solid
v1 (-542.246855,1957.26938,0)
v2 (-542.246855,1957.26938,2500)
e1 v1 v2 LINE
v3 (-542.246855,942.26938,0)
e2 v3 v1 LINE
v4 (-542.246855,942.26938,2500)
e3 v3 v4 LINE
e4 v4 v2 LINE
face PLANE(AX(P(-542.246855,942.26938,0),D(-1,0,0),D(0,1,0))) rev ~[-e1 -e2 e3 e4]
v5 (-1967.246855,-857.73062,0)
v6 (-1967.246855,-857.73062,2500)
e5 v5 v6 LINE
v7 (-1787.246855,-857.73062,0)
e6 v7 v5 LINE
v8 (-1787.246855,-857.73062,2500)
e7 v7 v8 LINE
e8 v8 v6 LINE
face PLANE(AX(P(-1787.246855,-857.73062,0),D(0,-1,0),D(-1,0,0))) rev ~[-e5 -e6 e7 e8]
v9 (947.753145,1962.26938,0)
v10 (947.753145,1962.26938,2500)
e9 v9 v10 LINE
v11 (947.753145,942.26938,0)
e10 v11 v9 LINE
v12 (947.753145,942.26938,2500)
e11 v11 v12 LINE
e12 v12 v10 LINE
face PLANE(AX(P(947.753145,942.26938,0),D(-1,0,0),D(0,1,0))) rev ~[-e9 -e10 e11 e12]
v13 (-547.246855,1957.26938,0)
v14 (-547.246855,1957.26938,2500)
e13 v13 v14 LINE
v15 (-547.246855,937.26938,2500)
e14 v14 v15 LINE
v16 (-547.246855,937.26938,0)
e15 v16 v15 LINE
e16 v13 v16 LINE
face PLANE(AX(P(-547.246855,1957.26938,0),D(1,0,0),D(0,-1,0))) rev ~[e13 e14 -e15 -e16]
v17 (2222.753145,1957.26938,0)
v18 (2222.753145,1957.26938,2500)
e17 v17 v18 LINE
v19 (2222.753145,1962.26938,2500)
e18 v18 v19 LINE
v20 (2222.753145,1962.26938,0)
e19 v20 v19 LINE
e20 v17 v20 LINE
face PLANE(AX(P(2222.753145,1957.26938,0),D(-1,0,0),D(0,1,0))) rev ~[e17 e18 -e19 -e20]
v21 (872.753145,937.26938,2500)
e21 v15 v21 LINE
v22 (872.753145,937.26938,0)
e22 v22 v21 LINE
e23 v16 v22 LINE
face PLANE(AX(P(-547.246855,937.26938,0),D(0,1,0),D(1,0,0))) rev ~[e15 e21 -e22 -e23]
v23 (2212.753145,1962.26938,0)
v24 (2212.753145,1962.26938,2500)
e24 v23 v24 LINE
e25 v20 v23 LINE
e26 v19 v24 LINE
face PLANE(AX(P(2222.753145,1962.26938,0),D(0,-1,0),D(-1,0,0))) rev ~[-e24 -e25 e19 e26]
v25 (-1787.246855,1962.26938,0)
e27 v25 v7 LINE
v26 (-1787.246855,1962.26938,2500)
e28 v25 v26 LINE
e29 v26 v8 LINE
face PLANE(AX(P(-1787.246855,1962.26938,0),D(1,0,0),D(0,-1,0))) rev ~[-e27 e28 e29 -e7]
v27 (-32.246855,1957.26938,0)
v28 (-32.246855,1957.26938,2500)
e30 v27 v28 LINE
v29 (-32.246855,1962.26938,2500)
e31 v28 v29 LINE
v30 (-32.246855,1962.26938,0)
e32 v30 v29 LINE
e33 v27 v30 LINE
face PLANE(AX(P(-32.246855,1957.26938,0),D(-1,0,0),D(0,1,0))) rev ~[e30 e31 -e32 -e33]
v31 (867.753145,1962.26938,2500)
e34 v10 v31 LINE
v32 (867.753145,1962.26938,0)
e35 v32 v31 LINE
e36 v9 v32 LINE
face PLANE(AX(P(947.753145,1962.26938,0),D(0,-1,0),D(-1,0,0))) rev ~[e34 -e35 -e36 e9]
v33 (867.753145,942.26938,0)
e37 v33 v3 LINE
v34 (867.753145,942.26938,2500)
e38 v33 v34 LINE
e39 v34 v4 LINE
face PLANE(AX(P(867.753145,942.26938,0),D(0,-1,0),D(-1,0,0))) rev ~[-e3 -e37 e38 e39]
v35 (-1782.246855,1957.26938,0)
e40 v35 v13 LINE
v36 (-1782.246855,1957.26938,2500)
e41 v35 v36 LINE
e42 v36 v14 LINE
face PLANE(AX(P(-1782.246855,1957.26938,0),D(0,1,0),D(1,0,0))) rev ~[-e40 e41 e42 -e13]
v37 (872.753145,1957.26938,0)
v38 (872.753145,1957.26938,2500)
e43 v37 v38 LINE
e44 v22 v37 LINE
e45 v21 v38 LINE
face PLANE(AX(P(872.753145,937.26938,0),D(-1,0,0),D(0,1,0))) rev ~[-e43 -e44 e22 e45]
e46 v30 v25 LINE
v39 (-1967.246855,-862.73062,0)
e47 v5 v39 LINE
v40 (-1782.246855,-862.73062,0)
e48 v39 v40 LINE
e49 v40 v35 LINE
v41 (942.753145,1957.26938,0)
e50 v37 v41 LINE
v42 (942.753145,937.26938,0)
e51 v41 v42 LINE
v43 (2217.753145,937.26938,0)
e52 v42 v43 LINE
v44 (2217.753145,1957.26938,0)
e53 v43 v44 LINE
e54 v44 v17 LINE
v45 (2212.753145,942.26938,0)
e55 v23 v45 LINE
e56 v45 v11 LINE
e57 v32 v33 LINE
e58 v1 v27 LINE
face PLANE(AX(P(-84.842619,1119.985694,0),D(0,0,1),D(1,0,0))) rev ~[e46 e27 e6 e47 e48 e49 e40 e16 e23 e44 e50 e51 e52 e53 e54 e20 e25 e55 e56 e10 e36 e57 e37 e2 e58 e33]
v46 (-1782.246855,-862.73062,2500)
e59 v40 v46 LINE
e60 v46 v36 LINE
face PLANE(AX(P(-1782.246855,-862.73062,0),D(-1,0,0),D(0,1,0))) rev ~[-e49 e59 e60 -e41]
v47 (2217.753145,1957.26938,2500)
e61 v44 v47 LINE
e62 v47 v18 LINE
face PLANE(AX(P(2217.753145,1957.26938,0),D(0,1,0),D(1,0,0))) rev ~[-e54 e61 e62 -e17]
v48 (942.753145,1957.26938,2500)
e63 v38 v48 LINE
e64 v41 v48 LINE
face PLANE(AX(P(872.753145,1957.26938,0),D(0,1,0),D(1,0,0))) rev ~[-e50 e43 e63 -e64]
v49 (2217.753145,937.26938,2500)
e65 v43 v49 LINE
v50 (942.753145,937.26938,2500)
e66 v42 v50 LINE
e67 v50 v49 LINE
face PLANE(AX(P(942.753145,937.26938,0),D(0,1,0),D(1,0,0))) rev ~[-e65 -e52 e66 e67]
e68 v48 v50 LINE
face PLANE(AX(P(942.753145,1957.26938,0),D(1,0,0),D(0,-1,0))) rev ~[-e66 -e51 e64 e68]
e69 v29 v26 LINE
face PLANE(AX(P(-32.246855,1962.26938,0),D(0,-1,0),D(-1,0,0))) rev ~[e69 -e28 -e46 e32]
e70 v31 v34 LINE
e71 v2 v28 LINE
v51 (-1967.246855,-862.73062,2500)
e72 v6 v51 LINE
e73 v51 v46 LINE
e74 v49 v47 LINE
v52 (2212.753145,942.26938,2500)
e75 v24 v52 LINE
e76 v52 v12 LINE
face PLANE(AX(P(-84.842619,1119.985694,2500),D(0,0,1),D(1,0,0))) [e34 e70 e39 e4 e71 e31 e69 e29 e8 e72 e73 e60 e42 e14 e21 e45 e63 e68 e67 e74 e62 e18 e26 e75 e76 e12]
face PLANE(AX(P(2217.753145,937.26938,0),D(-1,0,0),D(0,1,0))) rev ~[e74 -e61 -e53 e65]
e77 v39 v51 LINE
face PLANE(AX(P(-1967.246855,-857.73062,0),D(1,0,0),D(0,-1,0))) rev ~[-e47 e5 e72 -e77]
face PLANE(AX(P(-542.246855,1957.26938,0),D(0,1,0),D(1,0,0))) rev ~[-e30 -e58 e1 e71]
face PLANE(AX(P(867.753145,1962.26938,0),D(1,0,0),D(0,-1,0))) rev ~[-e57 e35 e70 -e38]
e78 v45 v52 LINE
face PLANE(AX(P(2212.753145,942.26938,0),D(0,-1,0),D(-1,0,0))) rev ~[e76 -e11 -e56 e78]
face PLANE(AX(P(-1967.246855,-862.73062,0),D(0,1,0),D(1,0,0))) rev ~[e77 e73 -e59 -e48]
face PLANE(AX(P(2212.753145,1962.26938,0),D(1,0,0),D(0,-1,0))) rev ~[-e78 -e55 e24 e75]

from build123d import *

# Parameters (mm, degrees)
F0_W     = 510
F0_H     = 5
F1_DEPTH = 2500


# Not quite as in the source:
# - a feature names something its author has since deleted; it is built from what else it names


with BuildPart() as f1:
    # F0 (on Top) → F1 (new body)
    with BuildSketch(Plane.XY):
        Polygon((867.7531446819, 942.2693800055), (-542.2468553181, 942.2693800055), (-542.2468553181, 1957.2693800055), (-542.2468553181, 1962.2693800055), (-1787.2468553181, 1962.2693800055), (-1787.2468553181, -857.7306199945), (-1967.2468553181, -857.7306199945), (-1967.2468553181, -862.7306199945), (-1782.2468553181, -862.7306199945), (-1782.2468553181, 1957.2693800055), (-547.2468553181, 1957.2693800055), (-547.2468553181, 937.2693800055), (872.7531446819, 937.2693800055), (872.7531446819, 1957.2693800055), (942.7531446819, 1957.2693800055), (942.7531446819, 937.2693800055), (2217.7531446819, 937.2693800055), (2217.7531446819, 1957.2693800055), (2222.7531446819, 1957.2693800055), (2222.7531446819, 1962.2693800055), (2212.7531446819, 1962.2693800055), (2212.7531446819, 942.2693800055), (947.7531446819, 942.2693800055), (947.7531446819, 1962.2693800055), (867.7531446819, 1962.2693800055), align=None)
        with Locations((-287.2468553181, 1959.7693800055)):
            Rectangle(F0_W, F0_H)
    extrude(amount=F1_DEPTH)


solid = f1.part
